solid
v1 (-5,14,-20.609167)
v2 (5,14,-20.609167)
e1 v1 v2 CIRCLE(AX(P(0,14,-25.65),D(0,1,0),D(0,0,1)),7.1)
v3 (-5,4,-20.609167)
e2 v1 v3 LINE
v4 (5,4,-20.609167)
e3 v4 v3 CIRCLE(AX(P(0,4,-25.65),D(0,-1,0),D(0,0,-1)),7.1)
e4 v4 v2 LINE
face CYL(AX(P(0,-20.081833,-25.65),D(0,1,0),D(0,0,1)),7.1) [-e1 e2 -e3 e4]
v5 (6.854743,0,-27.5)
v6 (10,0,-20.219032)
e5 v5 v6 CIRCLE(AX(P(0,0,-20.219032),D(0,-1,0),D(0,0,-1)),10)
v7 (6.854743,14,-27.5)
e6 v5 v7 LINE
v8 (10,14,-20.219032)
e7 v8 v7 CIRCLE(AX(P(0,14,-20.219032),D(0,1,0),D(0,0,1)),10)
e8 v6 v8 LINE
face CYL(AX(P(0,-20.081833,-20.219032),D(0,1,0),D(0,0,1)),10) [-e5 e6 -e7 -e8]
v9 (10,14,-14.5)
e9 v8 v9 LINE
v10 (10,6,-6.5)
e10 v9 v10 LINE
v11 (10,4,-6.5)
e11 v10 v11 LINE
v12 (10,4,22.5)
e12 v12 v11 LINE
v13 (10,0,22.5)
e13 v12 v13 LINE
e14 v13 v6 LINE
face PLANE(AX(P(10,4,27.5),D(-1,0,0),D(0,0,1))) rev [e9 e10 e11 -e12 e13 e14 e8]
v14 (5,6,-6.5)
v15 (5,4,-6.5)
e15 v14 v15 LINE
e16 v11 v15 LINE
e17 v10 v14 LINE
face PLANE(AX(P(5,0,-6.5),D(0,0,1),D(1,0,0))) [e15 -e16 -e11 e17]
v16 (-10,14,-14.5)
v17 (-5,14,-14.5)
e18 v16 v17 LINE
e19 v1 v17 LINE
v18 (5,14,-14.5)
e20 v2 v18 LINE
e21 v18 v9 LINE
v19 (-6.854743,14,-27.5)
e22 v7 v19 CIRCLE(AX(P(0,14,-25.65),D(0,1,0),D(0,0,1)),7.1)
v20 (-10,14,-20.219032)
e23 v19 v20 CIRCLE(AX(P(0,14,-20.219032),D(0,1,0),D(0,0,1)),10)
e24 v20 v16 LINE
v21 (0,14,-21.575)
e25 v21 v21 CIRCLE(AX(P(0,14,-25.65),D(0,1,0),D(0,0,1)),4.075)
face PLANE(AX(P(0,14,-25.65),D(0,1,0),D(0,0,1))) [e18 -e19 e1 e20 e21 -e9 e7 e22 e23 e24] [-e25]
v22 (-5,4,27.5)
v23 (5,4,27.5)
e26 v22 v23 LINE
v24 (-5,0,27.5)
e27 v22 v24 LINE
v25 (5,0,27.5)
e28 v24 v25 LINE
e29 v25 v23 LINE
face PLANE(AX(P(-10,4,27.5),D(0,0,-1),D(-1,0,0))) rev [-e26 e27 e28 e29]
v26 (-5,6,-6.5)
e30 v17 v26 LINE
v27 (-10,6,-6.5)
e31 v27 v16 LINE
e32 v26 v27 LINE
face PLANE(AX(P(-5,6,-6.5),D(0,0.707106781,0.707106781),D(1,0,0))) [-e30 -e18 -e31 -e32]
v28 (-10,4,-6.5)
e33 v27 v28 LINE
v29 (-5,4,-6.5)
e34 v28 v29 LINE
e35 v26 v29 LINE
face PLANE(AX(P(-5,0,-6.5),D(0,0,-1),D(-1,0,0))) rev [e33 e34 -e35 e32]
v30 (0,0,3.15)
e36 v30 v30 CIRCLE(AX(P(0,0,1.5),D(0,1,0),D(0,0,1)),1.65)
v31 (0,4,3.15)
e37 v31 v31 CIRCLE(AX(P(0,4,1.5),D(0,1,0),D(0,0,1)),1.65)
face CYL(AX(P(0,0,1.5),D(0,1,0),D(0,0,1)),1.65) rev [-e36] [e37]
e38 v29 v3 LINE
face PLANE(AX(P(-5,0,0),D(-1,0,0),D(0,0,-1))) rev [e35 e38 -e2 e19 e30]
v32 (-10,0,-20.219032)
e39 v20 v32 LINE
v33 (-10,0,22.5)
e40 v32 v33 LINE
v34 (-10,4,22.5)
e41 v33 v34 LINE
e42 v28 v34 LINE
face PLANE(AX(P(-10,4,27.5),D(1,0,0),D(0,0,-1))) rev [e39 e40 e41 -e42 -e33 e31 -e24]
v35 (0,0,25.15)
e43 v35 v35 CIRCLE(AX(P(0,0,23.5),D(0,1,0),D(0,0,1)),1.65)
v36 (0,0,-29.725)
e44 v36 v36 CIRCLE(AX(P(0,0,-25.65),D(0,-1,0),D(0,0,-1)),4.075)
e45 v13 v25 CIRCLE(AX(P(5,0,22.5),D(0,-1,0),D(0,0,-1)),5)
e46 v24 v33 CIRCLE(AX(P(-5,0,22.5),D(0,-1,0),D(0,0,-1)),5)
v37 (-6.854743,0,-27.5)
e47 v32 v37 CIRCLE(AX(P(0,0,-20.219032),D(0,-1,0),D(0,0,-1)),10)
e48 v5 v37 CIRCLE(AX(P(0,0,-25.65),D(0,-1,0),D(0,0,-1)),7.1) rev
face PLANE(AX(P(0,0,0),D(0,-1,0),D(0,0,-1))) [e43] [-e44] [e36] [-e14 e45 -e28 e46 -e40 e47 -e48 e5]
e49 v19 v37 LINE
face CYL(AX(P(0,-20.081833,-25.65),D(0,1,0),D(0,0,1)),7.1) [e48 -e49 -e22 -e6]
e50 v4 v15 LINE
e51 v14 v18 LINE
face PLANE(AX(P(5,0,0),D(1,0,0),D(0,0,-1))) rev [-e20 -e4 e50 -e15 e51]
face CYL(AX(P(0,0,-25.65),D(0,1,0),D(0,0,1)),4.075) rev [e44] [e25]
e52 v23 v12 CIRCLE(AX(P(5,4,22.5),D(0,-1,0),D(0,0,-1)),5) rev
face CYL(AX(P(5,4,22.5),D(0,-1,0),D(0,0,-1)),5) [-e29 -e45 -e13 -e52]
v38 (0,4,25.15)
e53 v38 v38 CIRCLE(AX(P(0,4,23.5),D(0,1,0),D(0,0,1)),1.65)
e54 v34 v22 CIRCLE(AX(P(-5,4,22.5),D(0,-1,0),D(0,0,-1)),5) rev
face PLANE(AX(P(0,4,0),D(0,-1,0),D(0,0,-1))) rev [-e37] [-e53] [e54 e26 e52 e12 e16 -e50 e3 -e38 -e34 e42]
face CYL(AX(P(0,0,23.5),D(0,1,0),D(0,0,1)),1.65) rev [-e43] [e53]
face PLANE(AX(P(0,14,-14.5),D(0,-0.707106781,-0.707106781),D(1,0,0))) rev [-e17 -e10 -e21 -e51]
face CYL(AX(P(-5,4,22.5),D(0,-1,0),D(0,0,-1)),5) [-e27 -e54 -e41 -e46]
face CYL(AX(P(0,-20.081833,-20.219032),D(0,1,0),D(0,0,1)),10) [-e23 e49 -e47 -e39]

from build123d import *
from build123d.topology import SkipClean

# Parameters (mm, degrees)
SKETCH1_W                       = 20
SKETCH1_H                       = 55
BOSS_EXTRUDE1_DEPTH             = 4
CUT_EXTRUDE1_DEPTH              = 30.533878851
CUT_EXTRUDE1_DEPTH_BACK         = 30.533878851
SKETCH2_R                       = 4.075
SKETCH3_R                       = 7.1
SKETCH3_R_2                     = 4.075
BOSS_EXTRUDE2_DEPTH             = 10
BOSS_EXTRUDE2_DIRECTION_2_REACH = 31.534
SKETCH4_W                       = 21
SKETCH4_H                       = 14
BOSS_EXTRUDE3_DEPTH             = 5
CHAMFER1_SIZE                   = 8
CHAMFER1_OF_MIRROR1_SIZE        = 8
FILLET3_R                       = 10
FILLET4_R                       = 5
SKETCH5_R                       = 1.65
CUT_EXTRUDE2_DEPTH              = 36.672993987


with BuildPart() as part:
    # Sketch1 → Boss-Extrude1 (new body)
    with BuildSketch(Plane(origin=(0, 0, 0), x_dir=(1, 0, 0), z_dir=(0, 1, 0))):
        Rectangle(SKETCH1_W, SKETCH1_H)
    extrude(amount=BOSS_EXTRUDE1_DEPTH)

    # Sketch2 → Cut-Extrude1 (cut, two sides: drawn at the far end of the back side and taken through both)
    with BuildSketch(Plane(origin=(0, 4, 0), x_dir=(1, 0, 0), z_dir=(0, 1, 0)).offset(-CUT_EXTRUDE1_DEPTH_BACK)):
        with Locations((0, 25.65)):
            Circle(SKETCH2_R)
    extrude(amount=CUT_EXTRUDE1_DEPTH + CUT_EXTRUDE1_DEPTH_BACK, mode=Mode.SUBTRACT)

    # Sketch3 → Boss-Extrude2 (add)
    with BuildSketch(Plane(origin=(0, 4, 0), x_dir=(1, 0, 0), z_dir=(0, 1, 0))):
        with Locations(Location((0, 25.65, 0), (0, 0, 270))):
            Circle(SKETCH3_R)
        with Locations(Location((0, 25.65, 0), (0, 0, 270))):
            Circle(SKETCH3_R_2, mode=Mode.SUBTRACT)
    extrude(amount=BOSS_EXTRUDE2_DEPTH)

    # Boss-Extrude2 direction 2: up to this face of the body (flat: up to its plane)
    boss_extrude2_direction_2_end = Plane(part.part.faces().sort_by_distance((0, 0, 0.953538914))[0])
    # Sketch3 → Boss-Extrude2 direction 2 (add, up to the picked face)
    with BuildSketch(Plane(origin=(0, 4, 0), x_dir=(1, 0, 0), z_dir=(0, 1, 0)), mode=Mode.PRIVATE) as boss_extrude2_direction_2_sk1:
        with Locations(Location((0, 25.65, 0), (0, 0, 270))):
            Circle(SKETCH3_R)
        with Locations(Location((0, 25.65, 0), (0, 0, 270))):
            Circle(SKETCH3_R_2, mode=Mode.SUBTRACT)
    boss_extrude2_direction_2_tool1 = split(extrude(boss_extrude2_direction_2_sk1.sketch, amount=-BOSS_EXTRUDE2_DIRECTION_2_REACH, mode=Mode.PRIVATE), bisect_by=boss_extrude2_direction_2_end, keep=Keep.BOTH, mode=Mode.PRIVATE)
    add(boss_extrude2_direction_2_tool1.solids().sort_by(Axis((0, 4, -32.549182), (0, -1, 0)))[0])

    # Sketch4 → Boss-Extrude3 (add)
    with BuildSketch(Plane(origin=(10, 0, 0), x_dir=(0, 0, -1), z_dir=(1, 0, 0))):
        with Locations((17, 7)):
            Rectangle(SKETCH4_W, SKETCH4_H)
    boss_extrude3 = extrude(amount=-BOSS_EXTRUDE3_DEPTH)

    # Chamfer1
    chamfer1_edges = [part.edges().sort_by_distance(p)[0] for p in [
        (7.5, 14, -6.5),
    ]]
    chamfer(chamfer1_edges, length=CHAMFER1_SIZE)

    # Mirror1: Boss-Extrude3 across plane
    with SkipClean():  # the faces are left unmerged after this step: merging them gives an invalid solid
        add(boss_extrude3.mirror(Plane(origin=(0, 0, 0), x_dir=(0, 0, 1), z_dir=(1, 0, 0))))

    # Chamfer1 of Mirror1
    chamfer1_of_mirror1_edges = [part.edges().sort_by_distance(p)[0] for p in [
        (-7.5, 14, -6.5),
    ]]
    chamfer(chamfer1_of_mirror1_edges, length=CHAMFER1_OF_MIRROR1_SIZE)

    # Fillet3
    # the kernel refuses this fillet: 10 mm, written as the material it takes off along each edge
    with BuildSketch(Plane(origin=(10, 32.202420855, -27.5), x_dir=(0, 0, 1), z_dir=(0, -1, 0))) as fillet3_piece_1:
        with BuildLine():
            CenterArc((7.280968342, 10), FILLET3_R, 223.272918663, 46.727081337)
            Line((0, 3.145257116), (-0.145619367, 3.008162259))
            ThreePointArc((-0.145619367, 3.008162259), (-0.2, 1.572628558), (-0.2, 0))
            Line((-0.2, 0), (0, -0.2))
            Line((0, -0.2), (7.280968342, -0.2))
            Line((7.280968342, -0.2), (7.280968342, 0))
        make_face()
    extrude(amount=28.202420855, mode=Mode.SUBTRACT)
    with BuildSketch(Plane(origin=(-10, 32.202420855, -27.5), x_dir=(0, 0, 1), z_dir=(0, -1, 0))) as fillet3_piece_2:
        with BuildLine():
            CenterArc((7.280968342, -10), FILLET3_R, 90, 46.727081337)
            Line((0, -3.145257116), (-0.145619367, -3.008162259))
            ThreePointArc((-0.145619367, -3.008162259), (-0.2, -1.572628558), (-0.2, 0))
            Line((-0.2, 0), (0, 0.2))
            Line((0, 0.2), (7.280968342, 0.2))
            Line((7.280968342, 0.2), (7.280968342, 0))
        make_face()
    extrude(amount=28.202420855, mode=Mode.SUBTRACT)
    with BuildSketch(Plane(origin=(-10, -18.202420855, -27.5), x_dir=(0, 0, 1), z_dir=(0, 1, 0))) as fillet3_piece_3:
        with BuildLine():
            CenterArc((7.280968342, 10), FILLET3_R, 223.272918663, 46.727081337)
            Line((0, 3.145257116), (-0.145619367, 3.008162259))
            ThreePointArc((-0.145619367, 3.008162259), (-0.2, 1.572628558), (-0.2, 0))
            Line((-0.2, 0), (0, -0.2))
            Line((0, -0.2), (7.280968342, -0.2))
            Line((7.280968342, -0.2), (7.280968342, 0))
        make_face()
    extrude(amount=22.202420855, mode=Mode.SUBTRACT)
    with BuildSketch(Plane(origin=(10, -18.202420855, -27.5), x_dir=(0, 0, 1), z_dir=(0, 1, 0))) as fillet3_piece_4:
        with BuildLine():
            CenterArc((7.280968342, -10), FILLET3_R, 90, 46.727081337)
            Line((0, -3.145257116), (-0.145619367, -3.008162259))
            ThreePointArc((-0.145619367, -3.008162259), (-0.2, -1.572628558), (-0.2, 0))
            Line((-0.2, 0), (0, 0.2))
            Line((0, 0.2), (7.280968342, 0.2))
            Line((7.280968342, 0.2), (7.280968342, 0))
        make_face()
    extrude(amount=22.202420855, mode=Mode.SUBTRACT)

    # Fillet4
    fillet4_edges = [part.edges().sort_by_distance(p)[0] for p in [
        (10, 2, 27.5),
        (-10, 2, 27.5),
    ]]
    fillet(fillet4_edges, radius=FILLET4_R)

    # Sketch5 → Cut-Extrude2 (cut, through all)
    with BuildSketch(Plane(origin=(0, 4, 0), x_dir=(1, 0, 0), z_dir=(0, 1, 0))):
        with Locations(Location((0, -23.5, 0), (0, 0, 270))):
            Circle(SKETCH5_R)
        with Locations(Location((0, -1.5, 0), (0, 0, 270))):
            Circle(SKETCH5_R)
    extrude(amount=-CUT_EXTRUDE2_DEPTH, mode=Mode.SUBTRACT)


solid = part.part
